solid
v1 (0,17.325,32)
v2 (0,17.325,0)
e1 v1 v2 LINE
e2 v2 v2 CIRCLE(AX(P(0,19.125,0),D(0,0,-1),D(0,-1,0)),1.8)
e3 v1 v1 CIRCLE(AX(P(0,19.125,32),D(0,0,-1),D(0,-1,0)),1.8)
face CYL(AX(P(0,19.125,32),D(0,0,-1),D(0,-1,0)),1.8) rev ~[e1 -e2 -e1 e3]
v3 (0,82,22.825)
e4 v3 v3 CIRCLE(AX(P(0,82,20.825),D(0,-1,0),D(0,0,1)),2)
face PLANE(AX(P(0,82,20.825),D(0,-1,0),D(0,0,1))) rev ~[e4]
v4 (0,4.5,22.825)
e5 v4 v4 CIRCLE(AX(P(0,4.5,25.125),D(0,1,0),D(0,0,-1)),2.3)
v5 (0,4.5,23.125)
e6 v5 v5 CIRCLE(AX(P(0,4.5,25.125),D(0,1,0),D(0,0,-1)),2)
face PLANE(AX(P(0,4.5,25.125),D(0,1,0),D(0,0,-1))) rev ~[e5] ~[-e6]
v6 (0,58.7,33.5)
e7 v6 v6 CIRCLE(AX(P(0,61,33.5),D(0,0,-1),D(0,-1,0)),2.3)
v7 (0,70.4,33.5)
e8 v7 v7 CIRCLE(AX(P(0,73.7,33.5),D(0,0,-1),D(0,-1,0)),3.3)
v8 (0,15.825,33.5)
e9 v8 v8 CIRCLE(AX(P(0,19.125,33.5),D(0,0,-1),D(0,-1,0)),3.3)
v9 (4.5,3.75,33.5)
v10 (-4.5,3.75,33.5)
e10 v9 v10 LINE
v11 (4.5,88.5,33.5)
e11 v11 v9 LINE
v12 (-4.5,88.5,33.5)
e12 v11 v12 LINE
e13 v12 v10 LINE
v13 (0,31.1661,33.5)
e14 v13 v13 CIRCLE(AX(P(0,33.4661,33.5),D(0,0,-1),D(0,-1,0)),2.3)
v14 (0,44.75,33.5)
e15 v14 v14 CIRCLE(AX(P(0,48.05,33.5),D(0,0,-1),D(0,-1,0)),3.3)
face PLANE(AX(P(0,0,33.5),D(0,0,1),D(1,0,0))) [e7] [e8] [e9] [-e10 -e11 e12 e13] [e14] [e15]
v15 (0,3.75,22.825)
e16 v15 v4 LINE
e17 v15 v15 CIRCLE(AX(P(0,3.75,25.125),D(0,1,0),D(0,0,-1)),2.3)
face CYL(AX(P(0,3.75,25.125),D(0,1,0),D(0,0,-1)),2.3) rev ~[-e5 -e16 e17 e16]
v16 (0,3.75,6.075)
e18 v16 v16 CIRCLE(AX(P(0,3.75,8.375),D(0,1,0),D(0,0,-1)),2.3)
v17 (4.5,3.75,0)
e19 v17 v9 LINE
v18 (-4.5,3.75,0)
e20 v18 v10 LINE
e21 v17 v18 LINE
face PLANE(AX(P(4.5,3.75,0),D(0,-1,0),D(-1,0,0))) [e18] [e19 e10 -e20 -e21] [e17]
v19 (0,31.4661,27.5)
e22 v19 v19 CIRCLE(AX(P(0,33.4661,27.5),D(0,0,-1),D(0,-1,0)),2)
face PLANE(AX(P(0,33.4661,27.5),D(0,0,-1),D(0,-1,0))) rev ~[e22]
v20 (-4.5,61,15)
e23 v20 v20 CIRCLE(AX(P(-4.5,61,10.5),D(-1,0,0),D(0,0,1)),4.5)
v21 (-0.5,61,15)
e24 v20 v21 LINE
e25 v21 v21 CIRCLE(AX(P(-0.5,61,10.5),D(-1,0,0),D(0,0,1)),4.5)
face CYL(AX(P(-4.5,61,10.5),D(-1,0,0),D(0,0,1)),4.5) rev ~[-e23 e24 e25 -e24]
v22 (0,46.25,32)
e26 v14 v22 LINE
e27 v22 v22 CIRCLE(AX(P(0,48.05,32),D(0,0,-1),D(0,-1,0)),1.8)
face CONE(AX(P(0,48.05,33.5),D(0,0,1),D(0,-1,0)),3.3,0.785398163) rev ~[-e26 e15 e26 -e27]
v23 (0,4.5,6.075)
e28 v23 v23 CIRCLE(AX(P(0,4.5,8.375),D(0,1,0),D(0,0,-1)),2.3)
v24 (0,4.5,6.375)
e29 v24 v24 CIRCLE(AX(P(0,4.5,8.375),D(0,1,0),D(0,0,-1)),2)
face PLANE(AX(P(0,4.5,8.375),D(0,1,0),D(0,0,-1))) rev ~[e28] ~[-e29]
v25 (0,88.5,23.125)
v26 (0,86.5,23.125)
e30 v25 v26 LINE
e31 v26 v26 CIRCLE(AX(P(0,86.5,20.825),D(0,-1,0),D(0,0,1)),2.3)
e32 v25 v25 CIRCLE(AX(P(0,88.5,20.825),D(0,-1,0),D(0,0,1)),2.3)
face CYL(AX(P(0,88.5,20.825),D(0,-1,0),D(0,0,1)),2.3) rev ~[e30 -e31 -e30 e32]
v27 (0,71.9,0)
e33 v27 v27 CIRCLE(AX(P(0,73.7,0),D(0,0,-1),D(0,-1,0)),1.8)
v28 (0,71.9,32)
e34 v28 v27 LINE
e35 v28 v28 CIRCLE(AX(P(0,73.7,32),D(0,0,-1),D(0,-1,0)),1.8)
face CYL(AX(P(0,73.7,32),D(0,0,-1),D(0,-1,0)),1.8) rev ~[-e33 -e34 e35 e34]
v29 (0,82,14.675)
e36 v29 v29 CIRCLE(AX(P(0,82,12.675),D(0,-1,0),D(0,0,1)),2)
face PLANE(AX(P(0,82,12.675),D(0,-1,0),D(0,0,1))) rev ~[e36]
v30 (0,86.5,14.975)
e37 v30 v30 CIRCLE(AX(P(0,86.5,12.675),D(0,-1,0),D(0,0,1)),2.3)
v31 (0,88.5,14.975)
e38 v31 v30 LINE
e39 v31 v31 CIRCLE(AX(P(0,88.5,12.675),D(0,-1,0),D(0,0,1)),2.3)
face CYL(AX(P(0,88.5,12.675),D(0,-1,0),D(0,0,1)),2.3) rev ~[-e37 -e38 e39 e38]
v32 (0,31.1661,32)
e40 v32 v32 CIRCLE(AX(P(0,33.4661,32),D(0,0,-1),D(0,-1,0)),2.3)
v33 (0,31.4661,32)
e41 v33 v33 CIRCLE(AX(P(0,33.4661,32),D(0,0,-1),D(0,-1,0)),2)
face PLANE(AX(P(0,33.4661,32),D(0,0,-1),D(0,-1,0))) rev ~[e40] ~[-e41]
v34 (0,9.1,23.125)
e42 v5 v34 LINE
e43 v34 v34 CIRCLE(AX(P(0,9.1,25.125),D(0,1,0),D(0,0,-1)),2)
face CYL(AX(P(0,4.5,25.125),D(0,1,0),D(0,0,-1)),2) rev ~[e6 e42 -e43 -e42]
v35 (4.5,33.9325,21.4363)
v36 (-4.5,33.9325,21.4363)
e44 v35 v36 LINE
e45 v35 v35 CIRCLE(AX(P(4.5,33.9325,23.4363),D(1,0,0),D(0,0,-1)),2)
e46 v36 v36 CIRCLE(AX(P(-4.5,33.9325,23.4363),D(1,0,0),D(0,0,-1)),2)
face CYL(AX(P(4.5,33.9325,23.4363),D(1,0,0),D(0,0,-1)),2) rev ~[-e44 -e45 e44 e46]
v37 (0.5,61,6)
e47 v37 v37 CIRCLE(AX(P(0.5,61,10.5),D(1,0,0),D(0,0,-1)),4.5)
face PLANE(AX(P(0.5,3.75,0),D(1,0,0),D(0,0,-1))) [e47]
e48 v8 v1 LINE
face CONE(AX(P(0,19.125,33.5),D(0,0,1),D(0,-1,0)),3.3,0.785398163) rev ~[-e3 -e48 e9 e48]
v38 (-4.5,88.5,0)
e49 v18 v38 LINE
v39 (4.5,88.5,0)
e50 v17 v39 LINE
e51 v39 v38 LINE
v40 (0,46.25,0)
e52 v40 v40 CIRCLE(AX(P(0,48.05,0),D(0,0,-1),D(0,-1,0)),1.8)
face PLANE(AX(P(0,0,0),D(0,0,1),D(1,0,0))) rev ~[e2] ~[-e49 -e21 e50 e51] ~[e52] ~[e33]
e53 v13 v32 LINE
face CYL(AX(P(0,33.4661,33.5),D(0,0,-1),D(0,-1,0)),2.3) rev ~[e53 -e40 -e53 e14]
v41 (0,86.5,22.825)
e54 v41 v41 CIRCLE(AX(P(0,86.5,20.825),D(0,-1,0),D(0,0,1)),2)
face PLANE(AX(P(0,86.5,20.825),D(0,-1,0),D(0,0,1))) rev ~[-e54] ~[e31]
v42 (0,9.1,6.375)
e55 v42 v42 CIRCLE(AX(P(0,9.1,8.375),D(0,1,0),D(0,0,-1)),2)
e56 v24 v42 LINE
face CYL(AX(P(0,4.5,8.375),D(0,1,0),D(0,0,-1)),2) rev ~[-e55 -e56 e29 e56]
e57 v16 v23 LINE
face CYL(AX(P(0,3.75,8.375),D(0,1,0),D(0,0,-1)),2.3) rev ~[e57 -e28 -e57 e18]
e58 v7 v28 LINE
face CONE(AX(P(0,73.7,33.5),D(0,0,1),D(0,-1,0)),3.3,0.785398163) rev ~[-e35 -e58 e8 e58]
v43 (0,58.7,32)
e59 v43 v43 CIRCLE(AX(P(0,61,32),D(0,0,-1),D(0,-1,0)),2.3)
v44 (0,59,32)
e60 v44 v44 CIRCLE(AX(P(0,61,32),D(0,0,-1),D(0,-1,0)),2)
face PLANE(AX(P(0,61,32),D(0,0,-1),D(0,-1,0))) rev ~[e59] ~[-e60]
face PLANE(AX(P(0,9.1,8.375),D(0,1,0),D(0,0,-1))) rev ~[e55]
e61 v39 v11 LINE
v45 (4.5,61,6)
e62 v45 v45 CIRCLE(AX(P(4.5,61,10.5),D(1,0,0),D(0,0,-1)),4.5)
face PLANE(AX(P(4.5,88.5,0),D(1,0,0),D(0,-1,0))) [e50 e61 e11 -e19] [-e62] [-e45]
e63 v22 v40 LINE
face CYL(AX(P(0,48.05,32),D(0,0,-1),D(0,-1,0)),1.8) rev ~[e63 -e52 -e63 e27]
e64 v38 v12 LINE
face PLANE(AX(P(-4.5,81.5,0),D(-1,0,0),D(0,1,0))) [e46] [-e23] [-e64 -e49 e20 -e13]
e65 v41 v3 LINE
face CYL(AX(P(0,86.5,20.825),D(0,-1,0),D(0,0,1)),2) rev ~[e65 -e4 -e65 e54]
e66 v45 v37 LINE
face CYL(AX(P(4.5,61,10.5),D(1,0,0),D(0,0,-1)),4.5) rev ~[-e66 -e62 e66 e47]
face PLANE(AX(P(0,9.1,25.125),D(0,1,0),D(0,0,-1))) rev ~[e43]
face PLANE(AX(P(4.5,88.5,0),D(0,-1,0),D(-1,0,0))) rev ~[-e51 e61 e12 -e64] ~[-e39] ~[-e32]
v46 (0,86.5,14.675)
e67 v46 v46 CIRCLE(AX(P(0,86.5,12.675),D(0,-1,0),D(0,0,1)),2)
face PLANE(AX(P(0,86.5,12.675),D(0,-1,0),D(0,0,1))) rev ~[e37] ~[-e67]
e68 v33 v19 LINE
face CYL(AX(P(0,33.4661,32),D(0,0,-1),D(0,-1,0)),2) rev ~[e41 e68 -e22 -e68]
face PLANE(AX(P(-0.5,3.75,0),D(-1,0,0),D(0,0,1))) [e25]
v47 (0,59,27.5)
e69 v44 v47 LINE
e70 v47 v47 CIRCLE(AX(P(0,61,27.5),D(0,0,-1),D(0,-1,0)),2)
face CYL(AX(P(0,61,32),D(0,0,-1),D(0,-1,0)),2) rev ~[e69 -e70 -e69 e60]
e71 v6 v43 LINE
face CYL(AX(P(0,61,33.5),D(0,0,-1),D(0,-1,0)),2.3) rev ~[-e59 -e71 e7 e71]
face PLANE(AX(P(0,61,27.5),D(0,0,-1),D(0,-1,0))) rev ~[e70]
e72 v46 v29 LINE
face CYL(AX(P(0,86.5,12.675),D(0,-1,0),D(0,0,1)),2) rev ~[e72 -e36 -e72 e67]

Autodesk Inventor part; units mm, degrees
ref_plane "YZ Plane" through (0, 0, 0) normal (1, 0, 0) x (0, 1, 0)
ref_plane "XZ Plane" through (0, 0, 0) normal (0, 1, 0) x (-1, 0, 0)
ref_plane "Work Plane1" through (0, 0, 0) normal (0, 0, 1) x (1, 0, 0)
ref_plane "Work Plane2" through (-89, -40.3889, 33.5) normal (0, 0, 1) x (1, 0, 0)
sketch "Sketch1" plane through (0, 0, 0) normal (0, 0, 1) x (1, 0, 0)
  line L0 (23.5, 88.5) -> (-23.5, 88.5) projected
  line L1 (-23.5, 88.5) -> (-23.5, 36.5) projected
  line L2 (-26.5, 33.5) -> (-89, 33.5) projected
  line L3 (-89, 33.5) -> (-89, -72.5) projected
  line L4 (-89, -72.5) -> (-77, -72.5) projected
  line L5 (-74, -75.5) -> (-74, -93.5) projected
  line L6 (-74, -93.5) -> (74, -93.5) projected
  line L7 (74, -93.5) -> (74, -75.5) projected
  line L8 (77, -72.5) -> (89, -72.5) projected
  line L9 (89, -72.5) -> (89, 33.5) projected
  line L10 (89, 33.5) -> (26.5, 33.5) projected
  line L11 (23.5, 36.5) -> (23.5, 88.5) projected
  line L12 (-4.5, 81.5) -> (-4.5, 36.5) projected
  line L13 (-7.5, 33.5) -> (-13.5, 33.5) projected
  line L14 (-16.5, 36.5) -> (-16.5, 81.5) projected
  line L15 (-13.5, 84.5) -> (-7.5, 84.5) projected
  line L16 (16.5, 81.5) -> (16.5, 36.5) projected
  line L17 (13.5, 33.5) -> (7.5, 33.5) projected
  line L18 (4.5, 36.5) -> (4.5, 81.5) projected
  line L19 (7.5, 84.5) -> (13.5, 84.5) projected
  line L20 (-4.5, 88.5) -> (4.5, 88.5)
  line L21 (4.5, 88.5) -> (4.5, 3.75)
  line L22 (4.5, 3.75) -> (-4.5, 3.75)
  line L23 (-4.5, 3.75) -> (-4.5, 88.5)
  line L24 (-32.2, 4.75) -> (-59.9, 4.75)
  arc A0 (13.5, 33.5) -> (16.5, 36.5) centre (13.5, 36.5) ccw projected
  arc A1 (4.5, 36.5) -> (7.5, 33.5) centre (7.5, 36.5) ccw projected
  arc A2 (7.5, 84.5) -> (4.5, 81.5) centre (7.5, 81.5) ccw projected
  arc A3 (16.5, 81.5) -> (13.5, 84.5) centre (13.5, 81.5) ccw projected
  arc A4 (-4.5, 81.5) -> (-7.5, 84.5) centre (-7.5, 81.5) ccw projected
  arc A5 (-7.5, 33.5) -> (-4.5, 36.5) centre (-7.5, 36.5) ccw projected
  arc A6 (-16.5, 36.5) -> (-13.5, 33.5) centre (-13.5, 36.5) ccw projected
  arc A7 (-13.5, 84.5) -> (-16.5, 81.5) centre (-13.5, 81.5) ccw projected
  arc A8 (-26.5, 33.5) -> (-23.5, 36.5) centre (-26.5, 36.5) ccw projected
  arc A9 (-74, -75.5) -> (-77, -72.5) centre (-77, -75.5) ccw projected
  arc A10 (77, -72.5) -> (74, -75.5) centre (77, -75.5) ccw projected
  arc A11 (23.5, 36.5) -> (26.5, 33.5) centre (26.5, 36.5) ccw projected
  point P0 (0, 0)
  point P1 (-4.5, 81.5)
  point P2 (-4.5, 36.5)
  dimension "d0" = 1
extrude "Extrusion1" add sketch "Sketch1" along normal up to surface (33.5 mm away) contours L21 L18 L22 L23 L12 L0
sketch "Sketch2" plane through (4.5, 3.75, 0) normal (1, 0, 0) x (0, 0, -1)
  circle A0 centre (-23.4363, 30.1825) radius 2 projected
  point P0 (0, -3.75)
extrude "Extrusion2" cut sketch "Sketch2" against normal blind 10
sketch "Sketch3" plane through (4.5, 3.75, 0) normal (1, 0, 0) x (0, 0, -1)
  circle A0 centre (-10.5, 57.25) radius 4.5 projected
  point P0 (0, -3.75)
extrude "Extrusion3" cut sketch "Sketch3" against normal blind 4
sketch "Sketch4" plane through (-4.5, 3.75, 0) normal (-1, 0, 0) x (0, 0, 1)
  circle A0 centre (10.5, 57.25) radius 4.5 projected
  point P0 (0, -3.75)
extrude "Extrusion4" cut sketch "Sketch4" against normal blind 4
sketch "Sketch5" plane through (-4.5, 3.75, 33.5) normal (0, 0, 1) x (1, 0, 0)
  line L0 (5, 61.75) -> (5, 52.75) projected
  line L1 (4, 52.75) -> (4, 61.75) projected
  line L2 (9, 28.1825) -> (0, 28.1825) projected
  line L3 (9, 32.1825) -> (0, 32.1825) projected
  line L4 (17, 78.15) -> (-8, 78.15)
  line L5 (-8, 35.85) -> (17, 35.85)
  line L6 (9, 84.75) -> (9, 0) projected
  line L7 (0, 52.75) -> (0, 61.75) projected
  line L8 (9, 35.85) -> (0, 35.85)
  line L9 (0, 35.85) -> (0, 52.75)
  line L10 (0, 52.75) -> (9, 52.75)
  line L11 (9, 52.75) -> (9, 35.85)
  line L12 (0, 0) -> (0, 84.75) projected
  line L13 (9, 78.15) -> (0, 78.15)
  line L14 (0, 78.15) -> (0, 61.75)
  line L15 (0, 61.75) -> (9, 61.75)
  line L16 (9, 61.75) -> (9, 78.15)
  line L17 (-18, 8.625) -> (-18, 22.125) projected
  line L18 (-18, 15.375) -> (27, 15.375)
  line L19 (9, 35.85) -> (0, 52.75)
  line L20 (9, 61.75) -> (9, 52.75) projected
  line L21 (0, 35.85) -> (9, 52.75)
  line L22 (9, 61.75) -> (0, 78.15)
  line L23 (0, 61.75) -> (9, 78.15)
  point P0 (4.5, -3.75)
  point P1 (4.5, 15.375)
  point P2 (4.5, 44.3)
  point P3 (4.5, 69.95)
  dimension "d9" = 4.5
  dimension "d10" = 4.5
hole "Hole1" at (0, 19.125, 33.5) at (0, 48.05, 33.5) at (0, 73.7, 33.5) direction (0, 0, -1) diameter 3.6 end through all countersink diameter 6.6 countersink angle 90 clearance for "Countersunk Flat Head Screw ISO 2009/7046" size "M3" standard "ISO"
sketch "Sketch6" plane through (-4.5, 3.75, 0) normal (0, -1, 0) x (1, 0, 0)
  line L0 (9, 33.5) -> (0, 33.5) projected
  line L1 (0, 0) -> (0, 33.5) projected
  line L2 (0, 0) -> (9, 0) projected
  line L3 (9, 0) -> (9, 33.5) projected
  line L4 (0, 16.75) -> (9, 16.75)
  line L5 (9, 16.75) -> (0, 33.5)
  line L6 (9, 33.5) -> (0, 16.75)
  line L7 (0, 16.75) -> (9, 0)
  line L8 (9, 16.75) -> (0, 0)
  point P0 (4.5, 0)
  point P1 (4.5, 8.375)
  point P2 (4.5, 25.125)
hole "Hole2" at (0, 3.75, 8.375) at (0, 3.75, 25.125) direction (0, 1, 0) diameter 4 depth 5.35 counterbore diameter 4.6 counterbore depth 0.75
sketch "Sketch7" plane through (-4.5, 88.5, 0) normal (0, 1, 0) x (1, 0, 0)
  line L0 (0, -33.5) -> (9, -33.5) projected
  line L1 (0, -33.5) -> (9, -33.5) projected
  line L2 (9, 0) -> (9, -33.5) projected
  line L3 (9, 0) -> (0, 0) projected
  line L4 (0, 0) -> (0, -33.5) projected
  line L5 (-8, -1.4) -> (-8, -6.6) projected
  line L6 (-8, -32.1) -> (-8, -26.9) projected
  line L7 (17, -32.1) -> (17, -26.9) projected
  line L8 (17, -1.4) -> (17, -6.6) projected
  line L9 (17, -32.1) -> (-8, -32.1)
  line L10 (-8, -32.1) -> (-8, -26.9)
  line L11 (-8, -26.9) -> (17, -26.9)
  line L12 (17, -26.9) -> (17, -32.1)
  line L13 (-8, -6.6) -> (17, -6.6)
  line L14 (17, -6.6) -> (17, -1.4)
  line L15 (17, -1.4) -> (-8, -1.4)
  line L16 (-8, -1.4) -> (-8, -6.6)
  line L17 (17, -6.6) -> (-8, -6.6)
  line L18 (-8, -6.6) -> (-8, -8.6)
  line L19 (-8, -8.6) -> (17, -8.6)
  line L20 (17, -8.6) -> (17, -6.6)
  line L21 (-8, -26.9) -> (17, -26.9)
  line L22 (17, -26.9) -> (17, -24.9)
  line L23 (17, -24.9) -> (-8, -24.9)
  line L24 (-8, -24.9) -> (-8, -26.9)
  line L25 (9, 0) -> (9, -33.5) projected
  line L26 (9, -16.75) -> (0, -16.75)
  line L27 (0, 0) -> (0, -33.5) projected
  line L28 (9, -24.9) -> (0, -16.75)
  line L29 (9, -8.6) -> (0, -16.75)
  line L30 (0, -8.6) -> (9, -16.75)
  line L31 (9, -16.75) -> (0, -24.9)
  point P0 (4.5, 0)
  point P1 (4.5, -20.825)
  point P2 (4.5, -12.675)
  dimension "d25" = 2
  dimension "d26" = 2
hole "Hole3" at (0, 88.5, 20.825) at (0, 88.5, 12.675) direction (0, -1, 0) diameter 4 depth 6.5 counterbore diameter 4.6 counterbore depth 2
sketch "Sketch8" plane through (-4.5, 3.75, 33.5) normal (0, 0, 1) x (1, 0, 0)
  line L0 (26, 27.2497) -> (-17, 27.2497)
  line L1 (26, 31.2497) -> (-17, 31.2497)
  line L2 (4, 52.75) -> (-1, 52.75)
  line L3 (4, 61.75) -> (-1, 61.75)
  line L4 (10, 61.75) -> (5, 61.75)
  line L5 (9, 52.75) -> (5, 52.75) projected
  line L6 (0, 0) -> (0, 84.75) projected
  line L7 (9, 52.75) -> (0, 52.75)
  line L8 (0, 52.75) -> (0, 61.75)
  line L9 (0, 61.75) -> (9, 61.75)
  line L10 (9, 61.75) -> (9, 52.75)
  line L11 (9, 28.1825) -> (0, 28.1825) projected
  line L12 (0, 31.2497) -> (9, 31.2497)
  line L13 (9, 31.2497) -> (9, 28.1825)
  line L14 (9, 28.1825) -> (0, 28.1825)
  line L15 (0, 28.1825) -> (0, 31.2497)
  line L16 (9, 28.1825) -> (0, 31.2497)
  line L17 (0, 28.1825) -> (9, 31.2497)
  line L18 (9, 52.75) -> (0, 61.75)
  line L19 (0, 52.75) -> (9, 61.75)
  point P0 (4.5, -3.75)
  point P1 (4.5, 29.7161)
  point P2 (4.5, 57.25)
hole "Hole4" at (0, 33.4661, 33.5) at (0, 61, 33.5) direction (0, 0, -1) diameter 4 depth 6 counterbore diameter 4.6 counterbore depth 1.5
equation "\"d9\" = d10"
properties part number "middle_gear_holder"
